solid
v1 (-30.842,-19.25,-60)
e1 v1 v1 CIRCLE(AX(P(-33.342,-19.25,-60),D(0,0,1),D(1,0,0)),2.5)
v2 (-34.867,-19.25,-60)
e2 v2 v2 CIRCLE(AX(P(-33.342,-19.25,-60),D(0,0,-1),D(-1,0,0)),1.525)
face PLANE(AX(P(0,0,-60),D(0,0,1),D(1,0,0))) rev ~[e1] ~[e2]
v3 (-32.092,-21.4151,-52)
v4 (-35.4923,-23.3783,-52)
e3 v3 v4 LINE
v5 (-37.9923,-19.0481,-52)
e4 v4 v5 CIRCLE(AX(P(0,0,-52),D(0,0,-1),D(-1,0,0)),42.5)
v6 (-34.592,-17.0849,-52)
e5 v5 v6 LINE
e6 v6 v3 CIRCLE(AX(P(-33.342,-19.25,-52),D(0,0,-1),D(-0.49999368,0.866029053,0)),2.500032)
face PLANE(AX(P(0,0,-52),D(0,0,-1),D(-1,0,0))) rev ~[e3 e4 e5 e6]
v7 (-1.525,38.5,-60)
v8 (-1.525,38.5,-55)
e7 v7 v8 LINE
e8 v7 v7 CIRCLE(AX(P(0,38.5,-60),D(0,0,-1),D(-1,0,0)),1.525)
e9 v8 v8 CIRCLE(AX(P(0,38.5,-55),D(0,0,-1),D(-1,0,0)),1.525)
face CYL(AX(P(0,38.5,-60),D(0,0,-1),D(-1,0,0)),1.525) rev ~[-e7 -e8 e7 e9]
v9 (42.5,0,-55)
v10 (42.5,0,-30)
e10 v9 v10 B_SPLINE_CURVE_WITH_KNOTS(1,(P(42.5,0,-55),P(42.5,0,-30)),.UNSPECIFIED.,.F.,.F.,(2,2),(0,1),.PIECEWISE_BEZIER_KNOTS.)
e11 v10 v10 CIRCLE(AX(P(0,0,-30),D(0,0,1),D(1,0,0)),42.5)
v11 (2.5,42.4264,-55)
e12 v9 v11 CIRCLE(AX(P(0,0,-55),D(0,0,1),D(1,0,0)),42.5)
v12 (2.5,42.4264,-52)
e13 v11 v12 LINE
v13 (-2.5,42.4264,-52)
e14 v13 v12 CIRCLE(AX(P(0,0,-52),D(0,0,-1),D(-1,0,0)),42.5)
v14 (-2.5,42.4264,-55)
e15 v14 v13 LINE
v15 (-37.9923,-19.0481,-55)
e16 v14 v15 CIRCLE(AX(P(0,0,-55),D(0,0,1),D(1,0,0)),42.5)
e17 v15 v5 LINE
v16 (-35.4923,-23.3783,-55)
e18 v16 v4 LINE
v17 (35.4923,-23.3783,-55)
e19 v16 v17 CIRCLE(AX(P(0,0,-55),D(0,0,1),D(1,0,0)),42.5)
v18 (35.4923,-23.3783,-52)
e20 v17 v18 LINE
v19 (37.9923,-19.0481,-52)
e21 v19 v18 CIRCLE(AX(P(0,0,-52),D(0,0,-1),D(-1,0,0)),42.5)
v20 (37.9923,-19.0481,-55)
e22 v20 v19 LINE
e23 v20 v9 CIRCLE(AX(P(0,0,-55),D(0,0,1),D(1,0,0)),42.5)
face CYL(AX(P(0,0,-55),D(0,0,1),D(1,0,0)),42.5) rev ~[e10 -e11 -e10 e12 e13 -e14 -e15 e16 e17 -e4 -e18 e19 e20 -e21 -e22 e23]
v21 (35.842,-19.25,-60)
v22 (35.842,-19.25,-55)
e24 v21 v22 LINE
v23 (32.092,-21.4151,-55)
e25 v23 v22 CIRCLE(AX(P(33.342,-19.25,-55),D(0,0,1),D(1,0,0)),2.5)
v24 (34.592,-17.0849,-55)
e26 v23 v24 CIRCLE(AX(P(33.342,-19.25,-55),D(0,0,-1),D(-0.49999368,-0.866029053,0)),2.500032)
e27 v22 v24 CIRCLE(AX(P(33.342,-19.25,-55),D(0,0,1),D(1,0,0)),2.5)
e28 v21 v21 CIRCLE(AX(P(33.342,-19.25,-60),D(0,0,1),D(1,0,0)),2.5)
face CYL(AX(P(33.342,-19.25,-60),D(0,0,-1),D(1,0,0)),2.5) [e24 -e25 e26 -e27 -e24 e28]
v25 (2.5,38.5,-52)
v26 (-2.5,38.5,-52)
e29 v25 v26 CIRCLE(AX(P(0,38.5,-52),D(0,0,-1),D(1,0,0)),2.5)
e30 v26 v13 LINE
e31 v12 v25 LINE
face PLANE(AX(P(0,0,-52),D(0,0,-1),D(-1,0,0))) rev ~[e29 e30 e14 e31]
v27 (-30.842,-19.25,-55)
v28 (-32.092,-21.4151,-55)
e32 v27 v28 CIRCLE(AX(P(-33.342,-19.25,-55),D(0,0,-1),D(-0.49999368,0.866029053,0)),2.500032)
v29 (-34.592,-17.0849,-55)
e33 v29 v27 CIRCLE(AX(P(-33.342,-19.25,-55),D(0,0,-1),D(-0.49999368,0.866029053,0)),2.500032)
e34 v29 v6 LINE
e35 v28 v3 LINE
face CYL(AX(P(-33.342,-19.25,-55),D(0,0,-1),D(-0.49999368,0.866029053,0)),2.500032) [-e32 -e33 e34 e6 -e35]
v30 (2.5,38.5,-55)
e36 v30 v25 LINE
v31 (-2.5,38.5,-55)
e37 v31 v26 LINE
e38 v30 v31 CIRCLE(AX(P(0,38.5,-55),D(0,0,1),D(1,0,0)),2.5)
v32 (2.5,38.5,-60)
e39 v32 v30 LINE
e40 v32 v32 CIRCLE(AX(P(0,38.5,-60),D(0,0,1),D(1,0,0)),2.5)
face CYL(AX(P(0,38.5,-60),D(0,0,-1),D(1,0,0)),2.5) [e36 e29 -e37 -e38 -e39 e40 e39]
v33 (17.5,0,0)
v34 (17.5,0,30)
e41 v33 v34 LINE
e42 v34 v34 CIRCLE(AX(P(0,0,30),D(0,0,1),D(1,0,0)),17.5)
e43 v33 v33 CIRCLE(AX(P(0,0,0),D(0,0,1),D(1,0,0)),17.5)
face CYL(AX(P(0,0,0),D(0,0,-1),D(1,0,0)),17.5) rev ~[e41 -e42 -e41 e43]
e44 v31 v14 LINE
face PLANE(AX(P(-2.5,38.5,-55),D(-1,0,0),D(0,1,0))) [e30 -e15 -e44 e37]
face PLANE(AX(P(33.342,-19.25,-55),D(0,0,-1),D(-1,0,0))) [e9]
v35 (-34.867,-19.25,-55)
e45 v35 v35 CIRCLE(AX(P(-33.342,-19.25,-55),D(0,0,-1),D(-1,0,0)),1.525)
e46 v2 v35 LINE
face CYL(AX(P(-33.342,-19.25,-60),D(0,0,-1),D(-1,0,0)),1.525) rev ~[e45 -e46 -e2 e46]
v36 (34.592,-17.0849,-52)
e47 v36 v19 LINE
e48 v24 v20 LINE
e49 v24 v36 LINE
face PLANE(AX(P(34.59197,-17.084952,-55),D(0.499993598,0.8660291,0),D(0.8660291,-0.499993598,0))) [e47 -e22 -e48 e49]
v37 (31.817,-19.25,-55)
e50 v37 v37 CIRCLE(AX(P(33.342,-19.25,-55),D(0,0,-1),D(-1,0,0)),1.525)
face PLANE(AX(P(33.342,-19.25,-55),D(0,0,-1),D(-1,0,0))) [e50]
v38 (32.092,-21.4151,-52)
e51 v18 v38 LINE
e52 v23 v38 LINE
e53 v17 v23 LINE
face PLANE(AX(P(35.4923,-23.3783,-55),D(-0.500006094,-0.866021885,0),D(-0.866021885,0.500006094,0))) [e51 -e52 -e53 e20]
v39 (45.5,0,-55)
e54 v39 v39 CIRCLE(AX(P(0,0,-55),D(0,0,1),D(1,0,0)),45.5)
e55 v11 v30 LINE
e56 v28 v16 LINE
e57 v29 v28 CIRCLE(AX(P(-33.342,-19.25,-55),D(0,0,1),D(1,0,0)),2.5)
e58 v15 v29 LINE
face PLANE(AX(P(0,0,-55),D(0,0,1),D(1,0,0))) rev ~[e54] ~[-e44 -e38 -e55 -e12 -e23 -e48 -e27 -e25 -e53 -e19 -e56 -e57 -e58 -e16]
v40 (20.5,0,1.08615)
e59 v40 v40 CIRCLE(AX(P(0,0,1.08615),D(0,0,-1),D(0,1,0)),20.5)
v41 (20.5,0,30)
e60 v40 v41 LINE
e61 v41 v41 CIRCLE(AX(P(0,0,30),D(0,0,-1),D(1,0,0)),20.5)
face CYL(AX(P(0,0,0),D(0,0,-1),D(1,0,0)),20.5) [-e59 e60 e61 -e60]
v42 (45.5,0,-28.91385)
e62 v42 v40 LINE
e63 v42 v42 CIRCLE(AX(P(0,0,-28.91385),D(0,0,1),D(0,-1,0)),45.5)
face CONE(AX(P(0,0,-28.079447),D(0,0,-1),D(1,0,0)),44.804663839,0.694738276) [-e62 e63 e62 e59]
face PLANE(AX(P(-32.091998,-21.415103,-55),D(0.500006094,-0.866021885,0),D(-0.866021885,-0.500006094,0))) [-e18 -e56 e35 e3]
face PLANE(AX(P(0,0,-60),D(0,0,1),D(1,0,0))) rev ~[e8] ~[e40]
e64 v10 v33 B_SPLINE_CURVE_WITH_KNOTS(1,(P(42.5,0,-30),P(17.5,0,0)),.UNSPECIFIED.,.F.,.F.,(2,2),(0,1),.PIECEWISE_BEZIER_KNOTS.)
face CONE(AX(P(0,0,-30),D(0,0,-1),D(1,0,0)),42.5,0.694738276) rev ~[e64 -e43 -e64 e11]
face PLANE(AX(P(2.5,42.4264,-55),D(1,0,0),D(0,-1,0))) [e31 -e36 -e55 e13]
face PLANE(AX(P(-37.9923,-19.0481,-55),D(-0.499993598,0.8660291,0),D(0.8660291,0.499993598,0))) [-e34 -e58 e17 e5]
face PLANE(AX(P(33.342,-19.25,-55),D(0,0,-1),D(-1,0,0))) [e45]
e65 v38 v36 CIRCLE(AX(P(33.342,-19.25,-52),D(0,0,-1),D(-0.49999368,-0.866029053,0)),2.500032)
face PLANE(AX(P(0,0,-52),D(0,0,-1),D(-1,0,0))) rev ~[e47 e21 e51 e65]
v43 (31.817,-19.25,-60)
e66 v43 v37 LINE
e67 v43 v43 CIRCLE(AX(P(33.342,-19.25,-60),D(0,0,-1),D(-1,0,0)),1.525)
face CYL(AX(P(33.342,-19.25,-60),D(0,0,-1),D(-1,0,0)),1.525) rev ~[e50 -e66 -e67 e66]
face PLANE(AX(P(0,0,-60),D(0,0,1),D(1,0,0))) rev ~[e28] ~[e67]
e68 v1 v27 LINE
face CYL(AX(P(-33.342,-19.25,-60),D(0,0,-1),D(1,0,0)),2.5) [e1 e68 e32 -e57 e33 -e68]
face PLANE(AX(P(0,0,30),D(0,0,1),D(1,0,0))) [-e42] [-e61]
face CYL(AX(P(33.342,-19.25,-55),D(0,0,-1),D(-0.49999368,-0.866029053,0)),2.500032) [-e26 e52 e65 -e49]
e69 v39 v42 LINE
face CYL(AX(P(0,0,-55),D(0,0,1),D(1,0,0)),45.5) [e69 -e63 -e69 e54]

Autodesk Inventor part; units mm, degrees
ref_plane "YZ Plane" through (0, 0, 0) normal (1, 0, 0) x (0, 1, 0)
ref_plane "XZ Plane" through (0, 0, 0) normal (0, 1, 0) x (-1, 0, 0)
sketch "Boceto1" plane through (0, 0, 0) normal (0, 0, 1) x (1, 0, 0)
  line L0 (0, 124.4663) -> (0, -121.5162) construction
  line L1 (-141.4483, 0) -> (147.5578, 0) construction
  circle A0 centre (0, 0) radius 17.5
  dimension "d0" = 35
extrude "Extrusión1" add sketch "Boceto1" along normal blind 30
ref_plane "Plano de trabajo1" through (0, 0, -30) normal (0, 0, 1) x (1, 0, 0)
sketch "Boceto2" plane through (0, 0, -30) normal (0, 0, 1) x (1, 0, 0)
  circle A0 centre (0, 0) radius 42.5
  dimension "d4" = 85
loft "Solevación1" add profiles "Boceto2" section 2 edges at (-17.5, 0, 0)
ref_plane "Plano de trabajo2" through (0, 0, -55) normal (0, 0, 1) x (1, 0, 0)
sketch "Boceto3" plane through (0, 0, -55) normal (0, 0, 1) x (1, 0, 0)
  circle A0 centre (0, 0) radius 42.5
  dimension "d10" = 85
loft "Solevación2" add profiles "Boceto3" section 2 edges at (-42.5, 0, -30)
shell "Vaciado1" thickness 3 outward yes removed faces 2 at (-10.6049, 7.3037, -55) at (4.3663, -1.0762, 30)
sketch "Boceto4" plane through (0, 0, -55) normal (0, 0, -1) x (-1, 0, 0)
  circle A0 centre (0, 0) radius 44.5
  circle A1 centre (0, 0) radius 42.5
  line L0 (-2.5, 42.4264) -> (-2.5, 36.4244)
  line L1 (-2.5, 36.4244) -> (2.5, 36.4244)
  line L2 (2.5, 36.4244) -> (2.5, 42.4264)
  line L3 (-61.729, 0) -> (90.2911, 0) construction
  line L4 (0, 48.1461) -> (0, -48.1461) construction
  circle A2 centre (0, 0) radius 37 construction
  circle A3 centre (0, 0) radius 40 construction
  circle A4 centre (0, 0) radius 38.5 construction
  arc A5 (-2.5, 38.5) -> (2.5, 38.5) centre (0, 38.5) ccw
  line L5 (-35.4923, -23.3783) -> (-30.2945, -20.3773)
  arc A6 (-32.092, -21.4151) -> (-34.592, -17.0849) centre (-33.342, -19.25) ccw
  line L6 (-32.7945, -16.0472) -> (-37.9923, -19.0481)
  line L7 (37.9923, -19.0481) -> (32.7945, -16.0472)
  arc A7 (34.592, -17.0849) -> (32.092, -21.4151) centre (33.342, -19.25) ccw
  line L8 (30.2945, -20.3773) -> (35.4923, -23.3783)
  dimension "d21" = 77
  dimension "d16" = 85
  dimension "d17" = 74
  dimension "d18" = 80
  dimension "d19" = 5
  dimension "d20" = 6.002
  dimension "d22" = 5
  dimension "d25" = 360
extrude "Extrusión2" add sketch "Boceto4" against normal blind 3 contours L2 A5 L1 L0 A1 | A1 L8 A7 L7 | L6 A6 L5 A1 | A5 L1
ref_plane "Plano de trabajo3" through (0, 0, -60) normal (0, 0, 1) x (1, 0, 0)
sketch "Boceto5" plane through (0, 0, -60) normal (0, 0, 1) x (1, 0, 0)
  line L0 (0, 47.3974) -> (0, -47.5019) construction
  line L1 (54.9107, 0) -> (-68.9978, 0) construction
  circle A0 centre (0, 0) radius 38.5 construction
  circle A1 centre (0, 38.5) radius 2.5
  circle A2 centre (-33.342, -19.25) radius 2.5
  circle A3 centre (33.342, -19.25) radius 2.5
  dimension "d30" = 77
  dimension "d31" = 5
  dimension "d34" = 360
extrude "Extrusión3" add sketch "Boceto5" along normal blind 5
sketch "Boceto6" plane through (33.342, -19.25, -60) normal (0, 0, -1) x (-1, 0, 0)
  circle A0 centre (0, 0) radius 1.525
  circle A1 centre (0, 0) radius 2.5 construction
  circle A2 centre (66.684, 0) radius 1.525
  circle A3 centre (33.342, 57.75) radius 1.525
  point P0 (33.342, 19.25)
  dimension "d38" = 3.05
  dimension "d39" = 0.975
  dimension "d42" = 360
extrude "Extrusión4" cut sketch "Boceto6" against normal blind 5
properties part number "CAPSULA 1 MEDIDOR ESPORAS"
